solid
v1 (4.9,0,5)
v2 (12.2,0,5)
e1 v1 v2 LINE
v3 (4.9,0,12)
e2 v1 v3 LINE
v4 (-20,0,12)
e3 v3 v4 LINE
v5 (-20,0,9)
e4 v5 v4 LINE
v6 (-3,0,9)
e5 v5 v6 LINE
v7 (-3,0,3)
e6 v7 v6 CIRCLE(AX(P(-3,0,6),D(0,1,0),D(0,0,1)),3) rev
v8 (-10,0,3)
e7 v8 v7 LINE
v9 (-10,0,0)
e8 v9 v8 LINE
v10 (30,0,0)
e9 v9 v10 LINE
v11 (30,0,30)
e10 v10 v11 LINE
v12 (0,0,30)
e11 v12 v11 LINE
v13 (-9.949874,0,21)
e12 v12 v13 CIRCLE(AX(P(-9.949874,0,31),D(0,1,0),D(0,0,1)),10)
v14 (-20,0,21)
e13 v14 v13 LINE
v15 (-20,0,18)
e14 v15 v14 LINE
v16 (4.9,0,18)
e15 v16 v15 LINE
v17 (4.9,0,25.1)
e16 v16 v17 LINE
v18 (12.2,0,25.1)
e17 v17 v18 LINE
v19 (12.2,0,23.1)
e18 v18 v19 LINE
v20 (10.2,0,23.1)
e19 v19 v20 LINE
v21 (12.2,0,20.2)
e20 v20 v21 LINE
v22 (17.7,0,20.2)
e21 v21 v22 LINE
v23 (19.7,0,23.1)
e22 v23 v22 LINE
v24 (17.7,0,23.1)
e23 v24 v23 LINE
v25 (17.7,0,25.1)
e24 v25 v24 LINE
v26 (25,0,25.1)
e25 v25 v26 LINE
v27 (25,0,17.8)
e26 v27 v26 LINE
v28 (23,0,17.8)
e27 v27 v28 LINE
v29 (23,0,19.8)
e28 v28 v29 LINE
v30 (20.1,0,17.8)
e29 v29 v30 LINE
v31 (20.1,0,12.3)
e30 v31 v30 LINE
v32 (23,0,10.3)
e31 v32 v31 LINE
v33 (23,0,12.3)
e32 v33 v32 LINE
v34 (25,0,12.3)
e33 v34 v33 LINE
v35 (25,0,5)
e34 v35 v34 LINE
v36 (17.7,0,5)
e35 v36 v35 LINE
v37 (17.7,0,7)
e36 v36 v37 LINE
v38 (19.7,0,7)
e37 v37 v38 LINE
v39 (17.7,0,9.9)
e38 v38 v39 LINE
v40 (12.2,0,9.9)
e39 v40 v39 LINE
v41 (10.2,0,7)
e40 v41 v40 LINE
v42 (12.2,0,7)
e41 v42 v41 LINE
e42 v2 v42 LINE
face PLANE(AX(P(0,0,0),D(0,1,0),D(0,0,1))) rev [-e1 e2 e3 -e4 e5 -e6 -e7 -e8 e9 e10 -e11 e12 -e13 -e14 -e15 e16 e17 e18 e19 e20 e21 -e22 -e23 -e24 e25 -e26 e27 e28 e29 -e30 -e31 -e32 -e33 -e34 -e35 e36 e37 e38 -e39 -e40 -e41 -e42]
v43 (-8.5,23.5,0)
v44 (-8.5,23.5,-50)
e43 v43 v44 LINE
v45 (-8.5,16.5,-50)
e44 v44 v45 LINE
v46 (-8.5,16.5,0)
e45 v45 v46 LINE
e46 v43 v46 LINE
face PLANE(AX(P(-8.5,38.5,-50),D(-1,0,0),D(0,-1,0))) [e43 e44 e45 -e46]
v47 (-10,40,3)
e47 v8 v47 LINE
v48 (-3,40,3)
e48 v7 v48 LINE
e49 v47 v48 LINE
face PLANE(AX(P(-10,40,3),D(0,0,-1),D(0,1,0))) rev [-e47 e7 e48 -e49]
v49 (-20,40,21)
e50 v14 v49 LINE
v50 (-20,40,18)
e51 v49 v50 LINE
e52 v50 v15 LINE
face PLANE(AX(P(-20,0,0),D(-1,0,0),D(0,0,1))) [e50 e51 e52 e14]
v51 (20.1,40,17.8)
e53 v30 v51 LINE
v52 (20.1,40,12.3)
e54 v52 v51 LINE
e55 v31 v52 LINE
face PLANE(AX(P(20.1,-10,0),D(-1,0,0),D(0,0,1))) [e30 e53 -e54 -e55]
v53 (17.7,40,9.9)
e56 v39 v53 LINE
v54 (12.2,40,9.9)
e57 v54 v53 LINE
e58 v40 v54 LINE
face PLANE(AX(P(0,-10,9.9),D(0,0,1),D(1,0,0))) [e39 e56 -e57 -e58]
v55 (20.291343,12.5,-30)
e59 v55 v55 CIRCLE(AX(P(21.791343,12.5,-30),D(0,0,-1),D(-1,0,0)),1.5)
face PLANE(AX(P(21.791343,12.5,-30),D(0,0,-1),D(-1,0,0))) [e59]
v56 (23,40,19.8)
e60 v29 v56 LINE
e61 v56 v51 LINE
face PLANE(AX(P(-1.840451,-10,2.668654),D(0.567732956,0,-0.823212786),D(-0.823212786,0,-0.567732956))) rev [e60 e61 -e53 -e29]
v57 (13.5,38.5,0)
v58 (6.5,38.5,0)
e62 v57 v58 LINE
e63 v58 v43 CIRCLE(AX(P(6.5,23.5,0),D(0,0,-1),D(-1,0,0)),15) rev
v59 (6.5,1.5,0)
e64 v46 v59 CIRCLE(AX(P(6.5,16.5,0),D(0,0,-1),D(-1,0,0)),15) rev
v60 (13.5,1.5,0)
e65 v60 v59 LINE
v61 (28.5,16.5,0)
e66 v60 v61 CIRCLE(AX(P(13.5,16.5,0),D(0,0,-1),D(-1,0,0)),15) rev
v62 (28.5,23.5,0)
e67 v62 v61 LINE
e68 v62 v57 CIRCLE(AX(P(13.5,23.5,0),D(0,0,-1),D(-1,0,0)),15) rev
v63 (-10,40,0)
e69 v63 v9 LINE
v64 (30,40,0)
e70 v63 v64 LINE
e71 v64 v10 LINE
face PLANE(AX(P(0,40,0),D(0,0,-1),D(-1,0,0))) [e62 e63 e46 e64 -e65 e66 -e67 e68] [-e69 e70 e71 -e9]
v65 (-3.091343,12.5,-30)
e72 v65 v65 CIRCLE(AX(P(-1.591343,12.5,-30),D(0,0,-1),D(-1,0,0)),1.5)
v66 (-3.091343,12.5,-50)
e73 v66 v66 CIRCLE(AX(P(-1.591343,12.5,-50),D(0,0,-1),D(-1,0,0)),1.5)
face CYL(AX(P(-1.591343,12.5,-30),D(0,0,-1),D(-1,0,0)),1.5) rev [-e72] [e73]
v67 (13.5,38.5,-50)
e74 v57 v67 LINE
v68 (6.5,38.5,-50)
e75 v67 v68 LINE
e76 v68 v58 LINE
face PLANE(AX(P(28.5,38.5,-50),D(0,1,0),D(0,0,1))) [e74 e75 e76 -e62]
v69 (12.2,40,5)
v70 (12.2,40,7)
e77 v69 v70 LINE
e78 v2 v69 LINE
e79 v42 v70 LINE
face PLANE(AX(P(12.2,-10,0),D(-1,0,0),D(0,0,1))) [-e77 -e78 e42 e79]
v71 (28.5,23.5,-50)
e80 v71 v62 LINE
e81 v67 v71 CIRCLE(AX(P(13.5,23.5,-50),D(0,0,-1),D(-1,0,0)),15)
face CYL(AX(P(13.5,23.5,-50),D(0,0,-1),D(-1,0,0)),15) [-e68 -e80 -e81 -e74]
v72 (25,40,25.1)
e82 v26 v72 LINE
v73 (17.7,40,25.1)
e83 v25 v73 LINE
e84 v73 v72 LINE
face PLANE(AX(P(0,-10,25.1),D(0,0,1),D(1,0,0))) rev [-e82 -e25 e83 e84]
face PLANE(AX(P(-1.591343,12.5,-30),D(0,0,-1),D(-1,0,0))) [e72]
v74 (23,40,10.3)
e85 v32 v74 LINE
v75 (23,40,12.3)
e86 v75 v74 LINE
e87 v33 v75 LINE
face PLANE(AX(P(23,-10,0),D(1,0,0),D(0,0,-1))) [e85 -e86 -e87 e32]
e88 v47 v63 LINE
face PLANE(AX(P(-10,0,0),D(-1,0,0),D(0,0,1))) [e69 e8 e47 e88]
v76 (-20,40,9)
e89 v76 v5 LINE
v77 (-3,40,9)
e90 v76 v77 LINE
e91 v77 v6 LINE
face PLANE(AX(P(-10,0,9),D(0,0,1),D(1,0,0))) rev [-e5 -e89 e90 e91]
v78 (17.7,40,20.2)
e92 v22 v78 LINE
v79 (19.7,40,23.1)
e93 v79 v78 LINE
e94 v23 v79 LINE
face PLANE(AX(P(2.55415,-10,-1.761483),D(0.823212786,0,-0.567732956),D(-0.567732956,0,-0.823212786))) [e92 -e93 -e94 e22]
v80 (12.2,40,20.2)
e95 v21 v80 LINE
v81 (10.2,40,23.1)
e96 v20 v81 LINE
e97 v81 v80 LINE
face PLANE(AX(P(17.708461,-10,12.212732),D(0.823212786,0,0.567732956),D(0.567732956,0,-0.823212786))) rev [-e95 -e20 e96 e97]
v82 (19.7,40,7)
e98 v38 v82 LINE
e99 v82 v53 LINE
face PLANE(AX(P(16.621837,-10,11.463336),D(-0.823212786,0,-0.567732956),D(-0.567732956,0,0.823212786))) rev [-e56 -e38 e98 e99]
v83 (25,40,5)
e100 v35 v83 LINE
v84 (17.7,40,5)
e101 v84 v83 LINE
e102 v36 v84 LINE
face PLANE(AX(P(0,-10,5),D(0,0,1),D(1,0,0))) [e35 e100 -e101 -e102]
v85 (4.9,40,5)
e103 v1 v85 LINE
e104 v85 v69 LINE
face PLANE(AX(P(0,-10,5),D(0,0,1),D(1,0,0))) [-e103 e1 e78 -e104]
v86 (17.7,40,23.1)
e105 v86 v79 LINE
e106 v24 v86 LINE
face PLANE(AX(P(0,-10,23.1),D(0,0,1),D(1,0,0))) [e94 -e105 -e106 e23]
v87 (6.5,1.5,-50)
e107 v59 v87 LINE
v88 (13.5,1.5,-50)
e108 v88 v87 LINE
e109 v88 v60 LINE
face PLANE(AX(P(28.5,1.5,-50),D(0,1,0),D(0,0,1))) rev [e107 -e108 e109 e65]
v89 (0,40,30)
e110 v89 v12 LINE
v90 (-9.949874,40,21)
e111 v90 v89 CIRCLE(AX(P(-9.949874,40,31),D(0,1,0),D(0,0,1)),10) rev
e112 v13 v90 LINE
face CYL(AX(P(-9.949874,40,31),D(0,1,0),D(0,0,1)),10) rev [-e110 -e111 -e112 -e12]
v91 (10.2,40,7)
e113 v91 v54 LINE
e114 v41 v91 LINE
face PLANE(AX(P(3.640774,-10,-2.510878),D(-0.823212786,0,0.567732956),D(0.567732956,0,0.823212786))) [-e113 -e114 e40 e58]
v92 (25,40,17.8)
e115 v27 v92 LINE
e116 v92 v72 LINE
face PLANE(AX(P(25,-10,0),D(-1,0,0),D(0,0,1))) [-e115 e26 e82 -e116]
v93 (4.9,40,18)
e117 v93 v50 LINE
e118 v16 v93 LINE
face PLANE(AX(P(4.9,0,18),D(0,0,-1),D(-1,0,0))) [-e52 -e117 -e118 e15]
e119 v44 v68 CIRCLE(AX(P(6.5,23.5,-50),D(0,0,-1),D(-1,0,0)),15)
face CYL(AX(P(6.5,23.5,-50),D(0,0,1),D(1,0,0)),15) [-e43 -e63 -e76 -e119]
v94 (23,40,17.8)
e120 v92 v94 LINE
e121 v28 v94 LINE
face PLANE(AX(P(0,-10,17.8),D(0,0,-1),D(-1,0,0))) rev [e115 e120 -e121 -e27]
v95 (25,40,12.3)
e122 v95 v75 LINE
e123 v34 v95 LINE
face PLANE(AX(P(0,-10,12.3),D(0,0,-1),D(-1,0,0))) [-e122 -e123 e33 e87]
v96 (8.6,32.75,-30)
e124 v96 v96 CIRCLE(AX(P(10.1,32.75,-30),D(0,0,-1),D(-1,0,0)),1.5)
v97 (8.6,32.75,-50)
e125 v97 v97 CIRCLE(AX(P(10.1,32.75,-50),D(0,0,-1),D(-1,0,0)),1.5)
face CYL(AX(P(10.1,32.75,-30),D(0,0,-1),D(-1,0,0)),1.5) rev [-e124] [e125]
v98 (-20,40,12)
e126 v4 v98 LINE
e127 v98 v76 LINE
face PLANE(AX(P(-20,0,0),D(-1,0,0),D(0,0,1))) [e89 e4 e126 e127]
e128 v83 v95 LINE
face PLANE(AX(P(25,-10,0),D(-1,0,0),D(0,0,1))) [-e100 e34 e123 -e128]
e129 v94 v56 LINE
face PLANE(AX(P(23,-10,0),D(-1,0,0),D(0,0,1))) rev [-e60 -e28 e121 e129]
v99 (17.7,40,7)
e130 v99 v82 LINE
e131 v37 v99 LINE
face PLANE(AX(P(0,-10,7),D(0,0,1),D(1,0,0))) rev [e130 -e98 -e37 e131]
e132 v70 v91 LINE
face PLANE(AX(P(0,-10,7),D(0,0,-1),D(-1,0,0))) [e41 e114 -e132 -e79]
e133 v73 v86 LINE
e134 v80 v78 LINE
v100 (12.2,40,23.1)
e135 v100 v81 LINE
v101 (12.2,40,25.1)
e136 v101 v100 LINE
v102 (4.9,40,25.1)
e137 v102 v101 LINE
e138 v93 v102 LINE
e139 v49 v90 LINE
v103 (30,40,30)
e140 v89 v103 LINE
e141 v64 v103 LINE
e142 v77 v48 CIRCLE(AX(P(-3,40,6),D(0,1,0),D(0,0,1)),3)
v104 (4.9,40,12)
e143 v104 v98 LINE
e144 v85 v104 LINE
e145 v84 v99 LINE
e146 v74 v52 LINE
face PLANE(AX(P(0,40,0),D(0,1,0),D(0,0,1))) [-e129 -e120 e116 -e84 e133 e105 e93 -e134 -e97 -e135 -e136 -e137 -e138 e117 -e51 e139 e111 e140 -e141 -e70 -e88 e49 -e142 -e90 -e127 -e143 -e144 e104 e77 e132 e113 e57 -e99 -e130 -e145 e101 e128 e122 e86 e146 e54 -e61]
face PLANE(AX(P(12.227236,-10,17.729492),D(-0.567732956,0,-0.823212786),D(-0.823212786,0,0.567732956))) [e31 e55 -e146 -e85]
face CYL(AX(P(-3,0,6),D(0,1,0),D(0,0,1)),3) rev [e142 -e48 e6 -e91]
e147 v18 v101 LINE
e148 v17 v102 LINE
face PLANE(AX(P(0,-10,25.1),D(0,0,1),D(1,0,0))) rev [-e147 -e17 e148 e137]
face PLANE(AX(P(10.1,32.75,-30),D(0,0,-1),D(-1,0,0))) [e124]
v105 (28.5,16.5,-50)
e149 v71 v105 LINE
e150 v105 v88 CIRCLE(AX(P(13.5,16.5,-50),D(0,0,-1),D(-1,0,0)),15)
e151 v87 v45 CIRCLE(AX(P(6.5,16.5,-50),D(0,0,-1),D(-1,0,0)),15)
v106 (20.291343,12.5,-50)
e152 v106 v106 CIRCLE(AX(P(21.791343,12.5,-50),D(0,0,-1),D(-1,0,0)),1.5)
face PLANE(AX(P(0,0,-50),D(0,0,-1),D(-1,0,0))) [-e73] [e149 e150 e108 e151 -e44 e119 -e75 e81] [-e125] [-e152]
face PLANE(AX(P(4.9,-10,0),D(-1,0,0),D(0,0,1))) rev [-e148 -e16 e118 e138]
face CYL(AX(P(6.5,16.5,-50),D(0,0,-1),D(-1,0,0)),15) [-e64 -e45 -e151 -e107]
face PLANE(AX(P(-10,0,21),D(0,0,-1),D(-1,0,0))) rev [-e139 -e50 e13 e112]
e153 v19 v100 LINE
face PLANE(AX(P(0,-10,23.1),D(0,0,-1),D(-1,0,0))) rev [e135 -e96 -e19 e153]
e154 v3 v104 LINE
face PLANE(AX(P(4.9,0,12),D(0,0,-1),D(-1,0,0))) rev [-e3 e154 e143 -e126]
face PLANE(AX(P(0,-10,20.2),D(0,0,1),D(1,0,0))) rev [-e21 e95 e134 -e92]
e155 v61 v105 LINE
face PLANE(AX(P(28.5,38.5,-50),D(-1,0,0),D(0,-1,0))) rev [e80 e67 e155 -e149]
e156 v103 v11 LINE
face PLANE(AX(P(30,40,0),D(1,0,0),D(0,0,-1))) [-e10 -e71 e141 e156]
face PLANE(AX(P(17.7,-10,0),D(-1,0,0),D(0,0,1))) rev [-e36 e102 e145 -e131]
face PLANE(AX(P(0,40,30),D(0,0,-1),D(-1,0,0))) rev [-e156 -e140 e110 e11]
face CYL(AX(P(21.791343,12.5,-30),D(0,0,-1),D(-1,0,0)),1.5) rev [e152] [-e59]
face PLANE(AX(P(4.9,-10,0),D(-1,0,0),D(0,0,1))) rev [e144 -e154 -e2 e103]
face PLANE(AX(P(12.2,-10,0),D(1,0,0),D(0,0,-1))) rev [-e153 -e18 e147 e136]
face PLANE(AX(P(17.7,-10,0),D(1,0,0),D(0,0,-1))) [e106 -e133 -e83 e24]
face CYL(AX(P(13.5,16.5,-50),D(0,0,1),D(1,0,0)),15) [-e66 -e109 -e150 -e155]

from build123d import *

# Parameters (mm, degrees)
SKETCH5_W           = 30
SKETCH5_H           = 30
BOSS_EXTRUDE3_DEPTH = 40
CUT_EXTRUDE1_DEPTH  = 50
SKETCH8_W           = 4.9
SKETCH8_H           = 6
CUT_EXTRUDE3_DEPTH  = 40
SKETCH10_W          = 3
SKETCH10_H          = 40
BOSS_EXTRUDE4_DEPTH = 10
SKETCH11_W          = 37
SKETCH11_H          = 37
BOSS_EXTRUDE5_DEPTH = 50
SKETCH14_R          = 1.5
CUT_EXTRUDE4_DEPTH  = 20
FILLET2_R           = 15
FILLET3_R           = 3
FILLET4_R           = 10
SKETCH15_W          = 3
SKETCH15_H          = 40
BOSS_EXTRUDE6_DEPTH = 10


# Some blends are built 0.0001 mm under size
with BuildPart() as part:
    # Sketch5 → Boss-Extrude3 (new body)
    with BuildSketch(Plane(origin=(0, 0, 0), x_dir=(1, 0, 0), z_dir=(0, 1, 0))):
        with Locations((15, -15)):
            Rectangle(SKETCH5_W, SKETCH5_H)
    extrude(amount=BOSS_EXTRUDE3_DEPTH)

    # Sketch6 → Cut-Extrude1 (cut)
    with BuildSketch(Plane(origin=(0, 40, 0), x_dir=(1, 0, 0), z_dir=(0, 1, 0))):
        Polygon((12.2, -5), (4.9, -5), (4.9, -15.05), (20.1, -15.05), (20.1, -12.3), (23, -10.3), (23, -12.3), (25, -12.3), (25, -5), (17.7, -5), (17.7, -7), (19.7, -7), (17.7, -9.9), (12.2, -9.9), (10.2, -7), (12.2, -7), align=None)
        Polygon((20.1, -15.05), (4.9, -15.05), (4.9, -25.1), (12.2, -25.1), (12.2, -23.1), (10.2, -23.1), (12.2, -20.2), (17.7, -20.2), (19.7, -23.1), (17.7, -23.1), (17.7, -25.1), (25, -25.1), (25, -17.8), (23, -17.8), (23, -19.8), (20.1, -17.8), align=None)
    extrude(amount=-CUT_EXTRUDE1_DEPTH, mode=Mode.SUBTRACT)

    # Sketch8 → Cut-Extrude3 (cut)
    with BuildSketch(Plane(origin=(0, 40, 0), x_dir=(1, 0, 0), z_dir=(0, 1, 0))):
        with Locations((2.45, -15)):
            Rectangle(SKETCH8_W, SKETCH8_H)
    extrude(amount=-CUT_EXTRUDE3_DEPTH, mode=Mode.SUBTRACT)

    # Sketch10 → Boss-Extrude4 (add)
    with BuildSketch(Plane.ZY):
        with Locations((1.5, 20)):
            Rectangle(SKETCH10_W, SKETCH10_H)
        with Locations((10.5, 20)):
            Rectangle(SKETCH10_W, SKETCH10_H)
        with Locations((19.5, 20)):
            Rectangle(SKETCH10_W, SKETCH10_H)
    extrude(amount=BOSS_EXTRUDE4_DEPTH)

    # Sketch11 → Boss-Extrude5 (add)
    with BuildSketch(Plane(origin=(0, 0, 0), x_dir=(-1, 0, 0), z_dir=(0, 0, -1))):
        with Locations((-10, 20)):
            Rectangle(SKETCH11_W, SKETCH11_H)
    extrude(amount=BOSS_EXTRUDE5_DEPTH)

    # Sketch14 → Cut-Extrude4 (cut)
    with BuildSketch(Plane(origin=(0, 0, -50), x_dir=(-1, 0, 0), z_dir=(0, 0, -1))):
        with Locations((-10.1, 32.75)):
            Circle(SKETCH14_R)
        with Locations((1.591342951, 12.5)):
            Circle(SKETCH14_R)
        with Locations((-21.791342951, 12.5)):
            Circle(SKETCH14_R)
    extrude(amount=-CUT_EXTRUDE4_DEPTH, mode=Mode.SUBTRACT)

    # Fillet2
    fillet2_edges = [part.edges().sort_by_distance(p)[0] for p in [
        (28.5, 38.5, -25),
        (28.5, 1.5, -25),
        (-8.5, 1.5, -25),
        (-8.5, 38.5, -25),
    ]]
    fillet(fillet2_edges, radius=FILLET2_R)

    # Fillet3
    fillet3_edges = [part.edges().sort_by_distance(p)[0] for p in [
        (0, 20, 3),
        (0, 20, 9),
    ]]
    fillet(fillet3_edges, radius=FILLET3_R - 0.0001)  # a hair under: the kernel refuses the full size

    # Fillet4
    # the kernel refuses this fillet: 10 mm, written as the material it adds along each edge
    with BuildSketch(Plane(origin=(0, 0, 21), x_dir=(0, 0, 1), z_dir=(0, 1, 0))) as fillet4_piece_1:
        with BuildLine():
            CenterArc((10, -9.949874371), FILLET4_R, 95.739170477, 84.260829523)
            Line((0, -9.949874371), (-0.2, -9.949874371))
            Line((-0.2, -9.949874371), (-0.2, 0))
            Line((-0.2, 0), (0, 0.2))
            ThreePointArc((0, 0.2), (4.5, 0.2), (8.98, 0.198997487))
            Line((8.98, 0.198997487), (9, 0))
        make_face()
    extrude(amount=40)

    # Sketch15 → Boss-Extrude6 (add)
    with BuildSketch(Plane.ZY.offset(10)):
        with Locations((10.5, 20)):
            Rectangle(SKETCH15_W, SKETCH15_H)
        with Locations((19.5, 20)):
            Rectangle(SKETCH15_W, SKETCH15_H)
    extrude(amount=BOSS_EXTRUDE6_DEPTH)


solid = part.part
